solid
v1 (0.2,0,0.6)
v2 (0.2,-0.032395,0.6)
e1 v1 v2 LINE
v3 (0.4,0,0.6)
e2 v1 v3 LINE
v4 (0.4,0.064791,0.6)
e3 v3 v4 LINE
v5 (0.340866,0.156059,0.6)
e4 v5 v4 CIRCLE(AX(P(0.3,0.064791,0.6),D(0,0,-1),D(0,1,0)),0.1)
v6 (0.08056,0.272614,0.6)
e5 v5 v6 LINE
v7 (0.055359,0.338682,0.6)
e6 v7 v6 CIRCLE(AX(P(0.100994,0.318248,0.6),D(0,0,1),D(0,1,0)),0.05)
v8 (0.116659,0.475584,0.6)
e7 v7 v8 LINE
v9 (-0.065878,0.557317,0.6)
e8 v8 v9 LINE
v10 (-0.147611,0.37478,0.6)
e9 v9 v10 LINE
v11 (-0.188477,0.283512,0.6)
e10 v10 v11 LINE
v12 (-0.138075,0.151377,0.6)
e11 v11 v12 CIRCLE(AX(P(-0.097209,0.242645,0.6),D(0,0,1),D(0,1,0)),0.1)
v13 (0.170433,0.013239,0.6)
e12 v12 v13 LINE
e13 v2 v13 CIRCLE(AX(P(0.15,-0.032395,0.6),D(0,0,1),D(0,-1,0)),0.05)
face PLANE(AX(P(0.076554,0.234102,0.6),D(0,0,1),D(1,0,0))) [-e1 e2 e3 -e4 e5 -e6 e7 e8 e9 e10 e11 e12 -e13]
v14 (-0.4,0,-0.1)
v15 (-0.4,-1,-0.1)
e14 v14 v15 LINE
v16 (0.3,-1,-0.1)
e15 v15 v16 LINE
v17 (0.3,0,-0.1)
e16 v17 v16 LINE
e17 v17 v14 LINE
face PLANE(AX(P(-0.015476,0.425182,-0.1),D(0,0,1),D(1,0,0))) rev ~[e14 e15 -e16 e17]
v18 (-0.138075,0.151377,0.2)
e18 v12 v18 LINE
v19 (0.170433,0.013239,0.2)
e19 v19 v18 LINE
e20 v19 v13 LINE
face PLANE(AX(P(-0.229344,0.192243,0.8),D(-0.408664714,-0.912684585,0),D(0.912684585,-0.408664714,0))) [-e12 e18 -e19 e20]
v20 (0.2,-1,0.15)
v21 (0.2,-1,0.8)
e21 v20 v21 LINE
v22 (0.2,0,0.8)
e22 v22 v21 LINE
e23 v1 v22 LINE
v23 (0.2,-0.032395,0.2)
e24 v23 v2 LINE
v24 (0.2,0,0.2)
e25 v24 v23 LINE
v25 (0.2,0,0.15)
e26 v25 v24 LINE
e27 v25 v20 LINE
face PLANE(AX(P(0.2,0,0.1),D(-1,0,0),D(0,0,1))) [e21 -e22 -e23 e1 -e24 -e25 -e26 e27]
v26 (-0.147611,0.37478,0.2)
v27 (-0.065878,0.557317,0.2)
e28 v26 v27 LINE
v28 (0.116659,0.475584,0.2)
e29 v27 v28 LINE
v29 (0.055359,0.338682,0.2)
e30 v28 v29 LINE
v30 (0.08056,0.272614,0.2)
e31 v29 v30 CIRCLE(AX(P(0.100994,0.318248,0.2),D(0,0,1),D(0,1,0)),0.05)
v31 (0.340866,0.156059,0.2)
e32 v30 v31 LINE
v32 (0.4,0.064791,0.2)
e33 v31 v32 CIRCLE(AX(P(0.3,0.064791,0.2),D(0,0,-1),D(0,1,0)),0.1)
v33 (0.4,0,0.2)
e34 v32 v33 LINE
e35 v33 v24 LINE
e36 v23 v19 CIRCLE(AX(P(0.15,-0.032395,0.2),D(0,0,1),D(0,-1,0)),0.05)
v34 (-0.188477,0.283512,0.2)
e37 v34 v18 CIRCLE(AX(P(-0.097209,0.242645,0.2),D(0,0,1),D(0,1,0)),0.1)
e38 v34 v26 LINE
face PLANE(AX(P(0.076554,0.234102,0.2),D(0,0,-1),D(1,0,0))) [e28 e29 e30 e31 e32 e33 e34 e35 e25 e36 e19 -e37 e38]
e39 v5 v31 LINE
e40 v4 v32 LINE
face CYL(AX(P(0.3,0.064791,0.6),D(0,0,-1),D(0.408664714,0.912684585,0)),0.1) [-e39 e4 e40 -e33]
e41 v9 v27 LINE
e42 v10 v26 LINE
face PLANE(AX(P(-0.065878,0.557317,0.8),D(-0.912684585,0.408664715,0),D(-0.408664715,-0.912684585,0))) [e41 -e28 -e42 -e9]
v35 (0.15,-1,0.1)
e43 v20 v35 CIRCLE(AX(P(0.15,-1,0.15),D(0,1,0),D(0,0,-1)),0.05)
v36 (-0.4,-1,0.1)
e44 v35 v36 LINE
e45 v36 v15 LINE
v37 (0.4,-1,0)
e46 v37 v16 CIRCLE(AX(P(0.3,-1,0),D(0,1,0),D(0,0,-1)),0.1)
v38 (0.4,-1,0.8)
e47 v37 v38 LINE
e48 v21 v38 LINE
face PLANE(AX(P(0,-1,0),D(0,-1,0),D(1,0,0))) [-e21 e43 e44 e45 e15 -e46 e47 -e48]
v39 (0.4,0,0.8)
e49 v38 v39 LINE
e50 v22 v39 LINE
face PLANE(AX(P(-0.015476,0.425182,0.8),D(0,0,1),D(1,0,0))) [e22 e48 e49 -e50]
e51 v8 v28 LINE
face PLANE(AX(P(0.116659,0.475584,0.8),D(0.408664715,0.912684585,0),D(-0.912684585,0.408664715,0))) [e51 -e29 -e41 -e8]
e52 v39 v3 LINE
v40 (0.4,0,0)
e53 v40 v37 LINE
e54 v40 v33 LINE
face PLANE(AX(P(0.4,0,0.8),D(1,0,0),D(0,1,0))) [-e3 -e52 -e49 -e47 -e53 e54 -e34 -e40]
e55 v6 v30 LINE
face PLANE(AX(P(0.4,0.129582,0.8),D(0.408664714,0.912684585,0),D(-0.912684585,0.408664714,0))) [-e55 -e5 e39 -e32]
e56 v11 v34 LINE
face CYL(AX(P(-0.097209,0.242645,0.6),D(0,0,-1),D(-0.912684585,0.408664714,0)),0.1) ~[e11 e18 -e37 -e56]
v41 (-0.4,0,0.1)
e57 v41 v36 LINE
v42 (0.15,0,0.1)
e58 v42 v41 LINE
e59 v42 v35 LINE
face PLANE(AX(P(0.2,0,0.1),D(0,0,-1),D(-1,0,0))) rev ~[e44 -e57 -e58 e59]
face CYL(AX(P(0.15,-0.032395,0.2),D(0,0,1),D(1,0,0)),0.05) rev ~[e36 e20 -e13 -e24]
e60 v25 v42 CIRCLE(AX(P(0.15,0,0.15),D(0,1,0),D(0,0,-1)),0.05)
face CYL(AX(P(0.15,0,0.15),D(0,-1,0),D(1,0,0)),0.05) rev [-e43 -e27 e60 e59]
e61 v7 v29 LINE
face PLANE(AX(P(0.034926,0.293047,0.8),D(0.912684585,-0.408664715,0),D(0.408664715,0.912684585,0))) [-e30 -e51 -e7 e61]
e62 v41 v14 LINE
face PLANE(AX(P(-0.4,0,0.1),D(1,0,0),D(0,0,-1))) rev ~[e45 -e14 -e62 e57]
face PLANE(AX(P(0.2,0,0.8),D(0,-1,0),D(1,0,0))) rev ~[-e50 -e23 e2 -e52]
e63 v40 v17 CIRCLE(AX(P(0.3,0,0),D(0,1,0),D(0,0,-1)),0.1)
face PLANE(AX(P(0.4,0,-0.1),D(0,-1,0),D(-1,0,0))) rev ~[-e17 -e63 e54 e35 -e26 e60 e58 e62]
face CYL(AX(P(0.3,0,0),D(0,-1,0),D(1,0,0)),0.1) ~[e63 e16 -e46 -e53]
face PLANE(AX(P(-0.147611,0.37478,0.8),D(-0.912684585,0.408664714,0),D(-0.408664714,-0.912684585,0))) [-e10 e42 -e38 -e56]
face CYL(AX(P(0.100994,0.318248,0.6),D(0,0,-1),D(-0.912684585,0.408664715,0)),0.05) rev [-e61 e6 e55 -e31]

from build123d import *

# Parameters (mm, degrees)
F0_W     = 0.2
F0_H     = 0.7
F1_DEPTH = 1
F3_DEPTH = 0.9
F5_DEPTH = 0.2
F7_DEPTH = 0.3
F8_R     = 0.05
F9_R     = 0.1


with BuildPart() as f1:
    # F0 (on Front) → F1 (new body)
    with BuildSketch(Plane.XZ):
        Polygon((0.2, 0.1), (-0.4, 0.1), (-0.4, -0.1), (0.4, -0.1), (0.4, 0.1), align=None)
        with Locations((0.3, 0.45)):
            Rectangle(F0_W, F0_H)
    extrude(amount=F1_DEPTH)

    # F2 (on face) → F3 (join)
    with BuildSketch(Plane.XY.offset(0.8)):
        Polygon((-0.0658778079, 0.5573172671), (-0.1476107508, 0.3747803502), (0.0349261661, 0.2930474073), (0.116659109, 0.4755843242), align=None)
        Polygon((-0.2293436937, 0.1922434332), (0.2, 0), (0.4, 0), (0.4, 0.1295815215), (0.0349261661, 0.2930474073), (-0.1476107508, 0.3747803502), align=None)
    extrude(amount=-F3_DEPTH)

    # F4 (on face) → F5 (cut)
    with BuildSketch(Plane.XY.offset(0.8)):
        Polygon((0.2, 0), (0.4, 0), (0.4, 0.1295815215), (0.0349261661, 0.2930474073), (0.116659109, 0.4755843242), (-0.0658778079, 0.5573172671), (-0.2293436937, 0.1922434332), align=None)
    extrude(amount=-F5_DEPTH, mode=Mode.SUBTRACT)

    # F6 (on face) → F7 (cut)
    with BuildSketch(Plane(origin=(0, 0, -0.1), x_dir=(1, 0, 0), z_dir=(0, 0, -1))):
        Polygon((0.4, -0.1295815215), (0.4, 0), (0.2, 0), (-0.2293436937, -0.1922434332), (-0.0658778079, -0.5573172671), (0.116659109, -0.4755843242), (0.0349261661, -0.2930474073), align=None)
    extrude(amount=-F7_DEPTH, mode=Mode.SUBTRACT)

    # F8
    f8_edges = [f1.edges().sort_by_distance(p)[0] for p in [
        (0.034926, 0.293047, 0.4),
        (0.2, 0, 0.4),
        (0.2, -0.5, 0.1),
    ]]
    fillet(f8_edges, radius=F8_R)

    # F9
    f9_edges = [f1.edges().sort_by_distance(p)[0] for p in [
        (0.4, -0.5, -0.1),
        (-0.229344, 0.192243, 0.4),
        (0.4, 0.129582, 0.4),
    ]]
    fillet(f9_edges, radius=F9_R)


solid = f1.part
